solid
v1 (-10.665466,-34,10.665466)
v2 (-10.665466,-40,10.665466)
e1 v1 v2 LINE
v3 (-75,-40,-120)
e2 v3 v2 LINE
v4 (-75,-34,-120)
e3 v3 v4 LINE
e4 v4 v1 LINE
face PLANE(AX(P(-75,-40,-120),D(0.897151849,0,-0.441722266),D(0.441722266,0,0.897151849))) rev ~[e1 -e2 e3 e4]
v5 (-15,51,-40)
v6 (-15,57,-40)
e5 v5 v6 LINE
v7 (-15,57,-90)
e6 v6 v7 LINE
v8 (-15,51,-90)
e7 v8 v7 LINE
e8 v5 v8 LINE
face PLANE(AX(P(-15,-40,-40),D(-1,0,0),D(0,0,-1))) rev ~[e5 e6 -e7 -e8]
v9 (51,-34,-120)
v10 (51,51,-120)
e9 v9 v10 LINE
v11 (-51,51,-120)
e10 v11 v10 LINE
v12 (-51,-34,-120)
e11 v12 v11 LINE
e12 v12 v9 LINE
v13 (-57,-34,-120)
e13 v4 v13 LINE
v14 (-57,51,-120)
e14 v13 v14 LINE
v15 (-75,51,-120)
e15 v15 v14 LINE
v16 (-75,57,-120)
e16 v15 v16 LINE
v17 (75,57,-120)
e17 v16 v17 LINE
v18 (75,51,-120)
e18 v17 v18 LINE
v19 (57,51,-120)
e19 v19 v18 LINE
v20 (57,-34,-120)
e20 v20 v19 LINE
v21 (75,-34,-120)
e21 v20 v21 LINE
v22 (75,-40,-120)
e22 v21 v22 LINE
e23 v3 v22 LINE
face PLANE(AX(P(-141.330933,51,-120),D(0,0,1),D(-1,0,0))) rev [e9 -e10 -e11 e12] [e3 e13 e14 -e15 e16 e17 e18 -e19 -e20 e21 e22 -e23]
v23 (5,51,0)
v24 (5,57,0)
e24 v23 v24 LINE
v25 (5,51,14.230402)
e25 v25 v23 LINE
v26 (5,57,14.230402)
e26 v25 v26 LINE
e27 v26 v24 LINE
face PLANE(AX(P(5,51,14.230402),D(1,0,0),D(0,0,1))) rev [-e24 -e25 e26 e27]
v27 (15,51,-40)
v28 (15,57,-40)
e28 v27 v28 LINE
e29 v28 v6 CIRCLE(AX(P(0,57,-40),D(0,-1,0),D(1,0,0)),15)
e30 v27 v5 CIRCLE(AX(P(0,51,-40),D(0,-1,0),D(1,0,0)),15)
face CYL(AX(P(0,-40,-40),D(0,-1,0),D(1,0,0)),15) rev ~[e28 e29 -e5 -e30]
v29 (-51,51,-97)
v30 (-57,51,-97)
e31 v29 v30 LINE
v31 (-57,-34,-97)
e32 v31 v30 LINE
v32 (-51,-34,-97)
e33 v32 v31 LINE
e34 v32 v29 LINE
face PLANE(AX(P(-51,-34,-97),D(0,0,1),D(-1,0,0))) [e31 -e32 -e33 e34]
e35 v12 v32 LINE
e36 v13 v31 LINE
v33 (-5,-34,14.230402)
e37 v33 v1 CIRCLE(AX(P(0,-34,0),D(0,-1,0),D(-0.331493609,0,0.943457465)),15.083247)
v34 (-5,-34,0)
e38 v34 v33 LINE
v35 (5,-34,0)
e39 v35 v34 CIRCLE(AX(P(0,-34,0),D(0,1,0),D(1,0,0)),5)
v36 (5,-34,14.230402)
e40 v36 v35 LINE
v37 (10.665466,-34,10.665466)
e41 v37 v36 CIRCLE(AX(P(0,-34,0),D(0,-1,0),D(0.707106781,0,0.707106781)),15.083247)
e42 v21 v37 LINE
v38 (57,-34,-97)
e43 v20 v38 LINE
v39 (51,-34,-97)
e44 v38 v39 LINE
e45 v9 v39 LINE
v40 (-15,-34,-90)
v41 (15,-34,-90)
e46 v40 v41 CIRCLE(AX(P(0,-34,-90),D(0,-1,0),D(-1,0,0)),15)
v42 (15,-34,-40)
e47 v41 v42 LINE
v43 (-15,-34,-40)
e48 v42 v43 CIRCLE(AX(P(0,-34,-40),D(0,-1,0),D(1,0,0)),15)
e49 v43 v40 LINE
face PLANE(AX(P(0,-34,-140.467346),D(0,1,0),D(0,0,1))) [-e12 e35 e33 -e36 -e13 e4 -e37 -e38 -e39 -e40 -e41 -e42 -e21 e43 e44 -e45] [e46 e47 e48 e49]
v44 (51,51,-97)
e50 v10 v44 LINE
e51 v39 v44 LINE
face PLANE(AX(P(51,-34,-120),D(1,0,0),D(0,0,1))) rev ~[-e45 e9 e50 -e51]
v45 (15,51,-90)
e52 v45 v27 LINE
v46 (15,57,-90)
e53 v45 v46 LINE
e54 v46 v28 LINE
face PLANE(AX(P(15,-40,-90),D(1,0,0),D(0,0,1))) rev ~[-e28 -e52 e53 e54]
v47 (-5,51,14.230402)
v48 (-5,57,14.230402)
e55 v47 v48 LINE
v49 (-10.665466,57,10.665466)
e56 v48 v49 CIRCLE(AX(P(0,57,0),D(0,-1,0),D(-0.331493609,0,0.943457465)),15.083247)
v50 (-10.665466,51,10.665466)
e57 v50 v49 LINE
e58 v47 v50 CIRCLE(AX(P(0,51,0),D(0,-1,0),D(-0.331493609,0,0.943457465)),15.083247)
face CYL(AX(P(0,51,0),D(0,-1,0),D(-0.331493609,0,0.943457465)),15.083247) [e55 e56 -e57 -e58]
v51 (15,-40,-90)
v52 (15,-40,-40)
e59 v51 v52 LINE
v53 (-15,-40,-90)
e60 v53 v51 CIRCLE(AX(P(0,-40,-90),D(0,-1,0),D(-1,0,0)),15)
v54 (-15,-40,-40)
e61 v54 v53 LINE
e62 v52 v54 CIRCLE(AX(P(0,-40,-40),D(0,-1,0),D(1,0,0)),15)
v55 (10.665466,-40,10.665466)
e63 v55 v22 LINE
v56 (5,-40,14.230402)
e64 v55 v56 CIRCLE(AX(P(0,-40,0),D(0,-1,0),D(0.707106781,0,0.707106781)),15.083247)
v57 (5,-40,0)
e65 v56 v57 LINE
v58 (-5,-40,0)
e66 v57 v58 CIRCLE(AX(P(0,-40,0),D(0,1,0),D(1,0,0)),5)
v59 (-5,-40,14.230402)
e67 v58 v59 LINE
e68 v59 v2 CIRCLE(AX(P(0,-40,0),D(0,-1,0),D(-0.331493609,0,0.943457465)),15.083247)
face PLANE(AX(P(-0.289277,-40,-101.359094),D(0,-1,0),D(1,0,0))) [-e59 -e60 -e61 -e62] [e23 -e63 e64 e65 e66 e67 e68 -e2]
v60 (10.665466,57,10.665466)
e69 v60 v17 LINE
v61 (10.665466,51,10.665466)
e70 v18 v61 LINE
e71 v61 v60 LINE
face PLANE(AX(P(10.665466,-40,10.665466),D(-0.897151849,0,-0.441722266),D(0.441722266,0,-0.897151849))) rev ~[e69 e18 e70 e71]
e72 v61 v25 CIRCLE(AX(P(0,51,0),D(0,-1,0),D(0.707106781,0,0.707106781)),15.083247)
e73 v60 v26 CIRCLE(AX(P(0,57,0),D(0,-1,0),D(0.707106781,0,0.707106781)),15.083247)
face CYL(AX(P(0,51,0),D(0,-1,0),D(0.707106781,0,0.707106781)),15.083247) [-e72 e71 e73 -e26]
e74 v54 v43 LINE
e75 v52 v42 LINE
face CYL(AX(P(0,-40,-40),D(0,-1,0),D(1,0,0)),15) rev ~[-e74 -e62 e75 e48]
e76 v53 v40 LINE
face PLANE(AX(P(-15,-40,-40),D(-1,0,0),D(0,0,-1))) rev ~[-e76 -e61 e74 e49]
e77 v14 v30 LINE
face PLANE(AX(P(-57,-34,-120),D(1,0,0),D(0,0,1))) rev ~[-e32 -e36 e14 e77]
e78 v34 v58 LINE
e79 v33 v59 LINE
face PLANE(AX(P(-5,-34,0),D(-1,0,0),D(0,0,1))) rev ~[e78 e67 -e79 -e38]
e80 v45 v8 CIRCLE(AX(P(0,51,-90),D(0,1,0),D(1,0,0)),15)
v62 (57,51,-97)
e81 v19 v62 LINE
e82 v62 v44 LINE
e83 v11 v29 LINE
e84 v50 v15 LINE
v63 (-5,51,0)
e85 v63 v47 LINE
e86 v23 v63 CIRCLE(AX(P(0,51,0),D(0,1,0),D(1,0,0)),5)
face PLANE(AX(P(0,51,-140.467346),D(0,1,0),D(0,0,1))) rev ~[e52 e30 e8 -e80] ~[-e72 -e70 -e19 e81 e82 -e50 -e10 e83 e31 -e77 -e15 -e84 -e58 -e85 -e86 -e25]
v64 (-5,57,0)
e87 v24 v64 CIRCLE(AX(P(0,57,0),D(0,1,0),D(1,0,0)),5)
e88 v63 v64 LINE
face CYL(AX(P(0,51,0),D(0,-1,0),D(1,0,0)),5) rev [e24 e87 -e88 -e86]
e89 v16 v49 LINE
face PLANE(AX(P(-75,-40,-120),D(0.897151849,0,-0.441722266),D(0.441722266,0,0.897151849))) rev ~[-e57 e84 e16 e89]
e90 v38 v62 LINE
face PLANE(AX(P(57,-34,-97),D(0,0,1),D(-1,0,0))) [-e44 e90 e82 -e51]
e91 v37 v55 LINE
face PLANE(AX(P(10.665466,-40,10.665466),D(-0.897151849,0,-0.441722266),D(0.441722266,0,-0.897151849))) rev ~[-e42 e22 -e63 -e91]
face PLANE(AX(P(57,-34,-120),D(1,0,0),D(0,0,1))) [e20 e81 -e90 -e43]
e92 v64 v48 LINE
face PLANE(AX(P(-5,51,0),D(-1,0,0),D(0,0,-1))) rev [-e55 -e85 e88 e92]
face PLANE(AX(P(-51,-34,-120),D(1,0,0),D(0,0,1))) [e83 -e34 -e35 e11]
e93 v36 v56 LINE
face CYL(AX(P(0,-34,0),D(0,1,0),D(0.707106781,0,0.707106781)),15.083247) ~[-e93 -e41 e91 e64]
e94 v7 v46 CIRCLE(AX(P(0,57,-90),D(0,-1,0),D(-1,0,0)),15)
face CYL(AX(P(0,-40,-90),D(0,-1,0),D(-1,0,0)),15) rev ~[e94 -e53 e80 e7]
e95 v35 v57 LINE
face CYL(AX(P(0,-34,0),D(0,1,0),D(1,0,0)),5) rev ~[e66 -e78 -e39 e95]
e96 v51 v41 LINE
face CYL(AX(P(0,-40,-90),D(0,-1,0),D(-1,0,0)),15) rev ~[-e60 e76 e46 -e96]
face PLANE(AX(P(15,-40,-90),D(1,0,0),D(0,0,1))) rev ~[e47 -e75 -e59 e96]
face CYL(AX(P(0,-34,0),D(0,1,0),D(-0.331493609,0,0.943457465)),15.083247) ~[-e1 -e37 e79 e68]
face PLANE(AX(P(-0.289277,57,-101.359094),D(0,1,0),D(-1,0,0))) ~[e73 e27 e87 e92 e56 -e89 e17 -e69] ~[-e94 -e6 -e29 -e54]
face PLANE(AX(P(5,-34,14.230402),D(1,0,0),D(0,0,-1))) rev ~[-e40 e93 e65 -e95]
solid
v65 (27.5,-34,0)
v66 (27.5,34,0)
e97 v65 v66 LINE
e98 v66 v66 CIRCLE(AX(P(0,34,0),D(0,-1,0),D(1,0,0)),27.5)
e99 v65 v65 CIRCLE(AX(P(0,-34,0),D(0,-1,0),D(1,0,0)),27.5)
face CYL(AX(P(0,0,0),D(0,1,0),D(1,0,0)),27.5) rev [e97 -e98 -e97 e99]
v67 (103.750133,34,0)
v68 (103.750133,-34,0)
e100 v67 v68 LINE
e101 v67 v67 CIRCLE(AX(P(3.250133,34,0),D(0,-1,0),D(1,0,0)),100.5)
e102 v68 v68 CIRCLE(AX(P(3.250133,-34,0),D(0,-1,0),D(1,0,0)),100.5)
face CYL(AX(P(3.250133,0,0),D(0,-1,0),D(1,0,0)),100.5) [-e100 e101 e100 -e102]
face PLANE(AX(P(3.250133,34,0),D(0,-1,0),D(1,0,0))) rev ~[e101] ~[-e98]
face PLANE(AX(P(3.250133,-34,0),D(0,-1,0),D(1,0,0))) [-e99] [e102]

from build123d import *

# Parameters (mm, degrees)
F0_R      = 100.5
F0_R_2    = 27.5
F1_DEPTH  = 34
F3_DEPTH  = 6
F4_W      = 150
F4_H      = 6
F5_DEPTH  = 85
F9_DEPTH  = 122
F12_W     = 85
F12_H     = 36.2278819084
F13_DEPTH = 172
F14_W     = 6
F14_H     = 23
F15_DEPTH = 85


# Not quite as in the source:
# - a feature of the source that left no trace in its solid (it failed there, or was rolled back) is left out
# - a feature names something its author has since deleted; it is built from what else it names


with BuildPart() as f1:
    # F0 (on Front) → F1 (new body, symmetric)
    with BuildSketch(Plane.XZ):
        with Locations((3.2501332462, 0)):
            Circle(F0_R)
        Circle(F0_R_2, mode=Mode.SUBTRACT)
    extrude(amount=F1_DEPTH, both=True)


with BuildPart() as f3:
    # F2 (on face) → F3 (new body)
    with BuildSketch(Plane.XZ.offset(34)):
        with BuildLine():
            ThreePointArc((82.7773839779, -61.4464514114), (0.9255990786, -100.4731135225), (-79.0337407783, -57.7028082117))
            Line((-79.0337407783, -57.7028082117), (-141.3309325666, -120))
            Line((-141.3309325666, -120), (141.3309325666, -120))
            Line((141.3309325666, -120), (82.7773839779, -61.4464514114))
        make_face()
        with BuildLine():
            ThreePointArc((26.9250120629, -5.5940794963), (0, -27.5), (-26.9250120629, -5.5940794963))
            Line((-26.9250120629, -5.5940794963), (-79.0337407783, -57.7028082117))
            ThreePointArc((-79.0337407783, -57.7028082117), (0.9255990786, -100.4731135225), (82.7773839779, -61.4464514114))
            Line((82.7773839779, -61.4464514114), (26.9250120629, -5.5940794963))
        make_face()
        with BuildLine():
            Line((-5, 0), (-5, 14.2304020351))
            ThreePointArc((-5, 14.2304020351), (-8.0329882483, 12.7661835285), (-10.6654662833, 10.6654662833))
            Line((-10.6654662833, 10.6654662833), (-26.9250120629, -5.5940794963))
            ThreePointArc((-26.9250120629, -5.5940794963), (0, -27.5), (26.9250120629, -5.5940794963))
            Line((26.9250120629, -5.5940794963), (10.6654662833, 10.6654662833))
            ThreePointArc((10.6654662833, 10.6654662833), (8.0329882483, 12.7661835285), (5, 14.2304020351))
            Line((5, 14.2304020351), (5, 0))
            ThreePointArc((5, 0), (0, -5), (-5, 0))
        make_face()
    extrude(amount=F3_DEPTH)

    # F4 (on face) → F5 (join)
    with BuildSketch(Plane(origin=(0, -34, 0), x_dir=(-1, 0, 0), z_dir=(0, 1, 0))):
        with Locations((0, -117)):
            Rectangle(F4_W, F4_H)
    extrude(amount=F5_DEPTH)

    # F7: F3 across plane


with BuildPart() as f3_1:
    add(f3.part)
    add(f3.part.mirror(Plane(origin=(0, 8.5, -94.3962931942), x_dir=(-1, 0, 0), z_dir=(0, 1, 0))))

    # F8 (on face) → F9 (cut)
    with BuildSketch(Plane.XZ.offset(40)):
        Polygon((-141.3309325666, -120), (-75, -120), (-75, -54.6672668584), (-75, -53.6690674334), align=None)
        Polygon((75, -53.6690674334), (75, -120), (141.3309325666, -120), align=None)
        with BuildLine():
            Line((15, -90), (15, -40))
            ThreePointArc((15, -40), (0, -25), (-15, -40))
            Line((-15, -40), (-15, -90))
            ThreePointArc((-15, -90), (0, -105), (15, -90))
        make_face()
        Polygon((-75, -54.6672668584), (-75, -120), (-10.6654662833, 10.6654662833), (-75, -53.6690674334), align=None)
        Polygon((10.6654662833, 10.6654662833), (75, -120), (75, -53.6690674334), align=None)
    extrude(amount=-F9_DEPTH, mode=Mode.SUBTRACT)

    # F12 (on Right) → F13 (cut, symmetric)
    with BuildSketch(Plane.YZ):
        with Locations((8.5, -122.3534047604)):
            Rectangle(F12_W, F12_H)
    extrude(amount=F13_DEPTH, both=True, mode=Mode.SUBTRACT)

    # F14 (on face) → F15 (join, through all)
    with BuildSketch(Plane(origin=(0, -34, 0), x_dir=(-1, 0, 0), z_dir=(0, 1, 0))):
        with Locations((-54, -108.5)):
            Rectangle(F14_W, F14_H)
        with Locations((54, -108.5)):
            Rectangle(F14_W, F14_H)
    extrude(amount=F15_DEPTH)


solid = Compound([f1.part, f3_1.part])
